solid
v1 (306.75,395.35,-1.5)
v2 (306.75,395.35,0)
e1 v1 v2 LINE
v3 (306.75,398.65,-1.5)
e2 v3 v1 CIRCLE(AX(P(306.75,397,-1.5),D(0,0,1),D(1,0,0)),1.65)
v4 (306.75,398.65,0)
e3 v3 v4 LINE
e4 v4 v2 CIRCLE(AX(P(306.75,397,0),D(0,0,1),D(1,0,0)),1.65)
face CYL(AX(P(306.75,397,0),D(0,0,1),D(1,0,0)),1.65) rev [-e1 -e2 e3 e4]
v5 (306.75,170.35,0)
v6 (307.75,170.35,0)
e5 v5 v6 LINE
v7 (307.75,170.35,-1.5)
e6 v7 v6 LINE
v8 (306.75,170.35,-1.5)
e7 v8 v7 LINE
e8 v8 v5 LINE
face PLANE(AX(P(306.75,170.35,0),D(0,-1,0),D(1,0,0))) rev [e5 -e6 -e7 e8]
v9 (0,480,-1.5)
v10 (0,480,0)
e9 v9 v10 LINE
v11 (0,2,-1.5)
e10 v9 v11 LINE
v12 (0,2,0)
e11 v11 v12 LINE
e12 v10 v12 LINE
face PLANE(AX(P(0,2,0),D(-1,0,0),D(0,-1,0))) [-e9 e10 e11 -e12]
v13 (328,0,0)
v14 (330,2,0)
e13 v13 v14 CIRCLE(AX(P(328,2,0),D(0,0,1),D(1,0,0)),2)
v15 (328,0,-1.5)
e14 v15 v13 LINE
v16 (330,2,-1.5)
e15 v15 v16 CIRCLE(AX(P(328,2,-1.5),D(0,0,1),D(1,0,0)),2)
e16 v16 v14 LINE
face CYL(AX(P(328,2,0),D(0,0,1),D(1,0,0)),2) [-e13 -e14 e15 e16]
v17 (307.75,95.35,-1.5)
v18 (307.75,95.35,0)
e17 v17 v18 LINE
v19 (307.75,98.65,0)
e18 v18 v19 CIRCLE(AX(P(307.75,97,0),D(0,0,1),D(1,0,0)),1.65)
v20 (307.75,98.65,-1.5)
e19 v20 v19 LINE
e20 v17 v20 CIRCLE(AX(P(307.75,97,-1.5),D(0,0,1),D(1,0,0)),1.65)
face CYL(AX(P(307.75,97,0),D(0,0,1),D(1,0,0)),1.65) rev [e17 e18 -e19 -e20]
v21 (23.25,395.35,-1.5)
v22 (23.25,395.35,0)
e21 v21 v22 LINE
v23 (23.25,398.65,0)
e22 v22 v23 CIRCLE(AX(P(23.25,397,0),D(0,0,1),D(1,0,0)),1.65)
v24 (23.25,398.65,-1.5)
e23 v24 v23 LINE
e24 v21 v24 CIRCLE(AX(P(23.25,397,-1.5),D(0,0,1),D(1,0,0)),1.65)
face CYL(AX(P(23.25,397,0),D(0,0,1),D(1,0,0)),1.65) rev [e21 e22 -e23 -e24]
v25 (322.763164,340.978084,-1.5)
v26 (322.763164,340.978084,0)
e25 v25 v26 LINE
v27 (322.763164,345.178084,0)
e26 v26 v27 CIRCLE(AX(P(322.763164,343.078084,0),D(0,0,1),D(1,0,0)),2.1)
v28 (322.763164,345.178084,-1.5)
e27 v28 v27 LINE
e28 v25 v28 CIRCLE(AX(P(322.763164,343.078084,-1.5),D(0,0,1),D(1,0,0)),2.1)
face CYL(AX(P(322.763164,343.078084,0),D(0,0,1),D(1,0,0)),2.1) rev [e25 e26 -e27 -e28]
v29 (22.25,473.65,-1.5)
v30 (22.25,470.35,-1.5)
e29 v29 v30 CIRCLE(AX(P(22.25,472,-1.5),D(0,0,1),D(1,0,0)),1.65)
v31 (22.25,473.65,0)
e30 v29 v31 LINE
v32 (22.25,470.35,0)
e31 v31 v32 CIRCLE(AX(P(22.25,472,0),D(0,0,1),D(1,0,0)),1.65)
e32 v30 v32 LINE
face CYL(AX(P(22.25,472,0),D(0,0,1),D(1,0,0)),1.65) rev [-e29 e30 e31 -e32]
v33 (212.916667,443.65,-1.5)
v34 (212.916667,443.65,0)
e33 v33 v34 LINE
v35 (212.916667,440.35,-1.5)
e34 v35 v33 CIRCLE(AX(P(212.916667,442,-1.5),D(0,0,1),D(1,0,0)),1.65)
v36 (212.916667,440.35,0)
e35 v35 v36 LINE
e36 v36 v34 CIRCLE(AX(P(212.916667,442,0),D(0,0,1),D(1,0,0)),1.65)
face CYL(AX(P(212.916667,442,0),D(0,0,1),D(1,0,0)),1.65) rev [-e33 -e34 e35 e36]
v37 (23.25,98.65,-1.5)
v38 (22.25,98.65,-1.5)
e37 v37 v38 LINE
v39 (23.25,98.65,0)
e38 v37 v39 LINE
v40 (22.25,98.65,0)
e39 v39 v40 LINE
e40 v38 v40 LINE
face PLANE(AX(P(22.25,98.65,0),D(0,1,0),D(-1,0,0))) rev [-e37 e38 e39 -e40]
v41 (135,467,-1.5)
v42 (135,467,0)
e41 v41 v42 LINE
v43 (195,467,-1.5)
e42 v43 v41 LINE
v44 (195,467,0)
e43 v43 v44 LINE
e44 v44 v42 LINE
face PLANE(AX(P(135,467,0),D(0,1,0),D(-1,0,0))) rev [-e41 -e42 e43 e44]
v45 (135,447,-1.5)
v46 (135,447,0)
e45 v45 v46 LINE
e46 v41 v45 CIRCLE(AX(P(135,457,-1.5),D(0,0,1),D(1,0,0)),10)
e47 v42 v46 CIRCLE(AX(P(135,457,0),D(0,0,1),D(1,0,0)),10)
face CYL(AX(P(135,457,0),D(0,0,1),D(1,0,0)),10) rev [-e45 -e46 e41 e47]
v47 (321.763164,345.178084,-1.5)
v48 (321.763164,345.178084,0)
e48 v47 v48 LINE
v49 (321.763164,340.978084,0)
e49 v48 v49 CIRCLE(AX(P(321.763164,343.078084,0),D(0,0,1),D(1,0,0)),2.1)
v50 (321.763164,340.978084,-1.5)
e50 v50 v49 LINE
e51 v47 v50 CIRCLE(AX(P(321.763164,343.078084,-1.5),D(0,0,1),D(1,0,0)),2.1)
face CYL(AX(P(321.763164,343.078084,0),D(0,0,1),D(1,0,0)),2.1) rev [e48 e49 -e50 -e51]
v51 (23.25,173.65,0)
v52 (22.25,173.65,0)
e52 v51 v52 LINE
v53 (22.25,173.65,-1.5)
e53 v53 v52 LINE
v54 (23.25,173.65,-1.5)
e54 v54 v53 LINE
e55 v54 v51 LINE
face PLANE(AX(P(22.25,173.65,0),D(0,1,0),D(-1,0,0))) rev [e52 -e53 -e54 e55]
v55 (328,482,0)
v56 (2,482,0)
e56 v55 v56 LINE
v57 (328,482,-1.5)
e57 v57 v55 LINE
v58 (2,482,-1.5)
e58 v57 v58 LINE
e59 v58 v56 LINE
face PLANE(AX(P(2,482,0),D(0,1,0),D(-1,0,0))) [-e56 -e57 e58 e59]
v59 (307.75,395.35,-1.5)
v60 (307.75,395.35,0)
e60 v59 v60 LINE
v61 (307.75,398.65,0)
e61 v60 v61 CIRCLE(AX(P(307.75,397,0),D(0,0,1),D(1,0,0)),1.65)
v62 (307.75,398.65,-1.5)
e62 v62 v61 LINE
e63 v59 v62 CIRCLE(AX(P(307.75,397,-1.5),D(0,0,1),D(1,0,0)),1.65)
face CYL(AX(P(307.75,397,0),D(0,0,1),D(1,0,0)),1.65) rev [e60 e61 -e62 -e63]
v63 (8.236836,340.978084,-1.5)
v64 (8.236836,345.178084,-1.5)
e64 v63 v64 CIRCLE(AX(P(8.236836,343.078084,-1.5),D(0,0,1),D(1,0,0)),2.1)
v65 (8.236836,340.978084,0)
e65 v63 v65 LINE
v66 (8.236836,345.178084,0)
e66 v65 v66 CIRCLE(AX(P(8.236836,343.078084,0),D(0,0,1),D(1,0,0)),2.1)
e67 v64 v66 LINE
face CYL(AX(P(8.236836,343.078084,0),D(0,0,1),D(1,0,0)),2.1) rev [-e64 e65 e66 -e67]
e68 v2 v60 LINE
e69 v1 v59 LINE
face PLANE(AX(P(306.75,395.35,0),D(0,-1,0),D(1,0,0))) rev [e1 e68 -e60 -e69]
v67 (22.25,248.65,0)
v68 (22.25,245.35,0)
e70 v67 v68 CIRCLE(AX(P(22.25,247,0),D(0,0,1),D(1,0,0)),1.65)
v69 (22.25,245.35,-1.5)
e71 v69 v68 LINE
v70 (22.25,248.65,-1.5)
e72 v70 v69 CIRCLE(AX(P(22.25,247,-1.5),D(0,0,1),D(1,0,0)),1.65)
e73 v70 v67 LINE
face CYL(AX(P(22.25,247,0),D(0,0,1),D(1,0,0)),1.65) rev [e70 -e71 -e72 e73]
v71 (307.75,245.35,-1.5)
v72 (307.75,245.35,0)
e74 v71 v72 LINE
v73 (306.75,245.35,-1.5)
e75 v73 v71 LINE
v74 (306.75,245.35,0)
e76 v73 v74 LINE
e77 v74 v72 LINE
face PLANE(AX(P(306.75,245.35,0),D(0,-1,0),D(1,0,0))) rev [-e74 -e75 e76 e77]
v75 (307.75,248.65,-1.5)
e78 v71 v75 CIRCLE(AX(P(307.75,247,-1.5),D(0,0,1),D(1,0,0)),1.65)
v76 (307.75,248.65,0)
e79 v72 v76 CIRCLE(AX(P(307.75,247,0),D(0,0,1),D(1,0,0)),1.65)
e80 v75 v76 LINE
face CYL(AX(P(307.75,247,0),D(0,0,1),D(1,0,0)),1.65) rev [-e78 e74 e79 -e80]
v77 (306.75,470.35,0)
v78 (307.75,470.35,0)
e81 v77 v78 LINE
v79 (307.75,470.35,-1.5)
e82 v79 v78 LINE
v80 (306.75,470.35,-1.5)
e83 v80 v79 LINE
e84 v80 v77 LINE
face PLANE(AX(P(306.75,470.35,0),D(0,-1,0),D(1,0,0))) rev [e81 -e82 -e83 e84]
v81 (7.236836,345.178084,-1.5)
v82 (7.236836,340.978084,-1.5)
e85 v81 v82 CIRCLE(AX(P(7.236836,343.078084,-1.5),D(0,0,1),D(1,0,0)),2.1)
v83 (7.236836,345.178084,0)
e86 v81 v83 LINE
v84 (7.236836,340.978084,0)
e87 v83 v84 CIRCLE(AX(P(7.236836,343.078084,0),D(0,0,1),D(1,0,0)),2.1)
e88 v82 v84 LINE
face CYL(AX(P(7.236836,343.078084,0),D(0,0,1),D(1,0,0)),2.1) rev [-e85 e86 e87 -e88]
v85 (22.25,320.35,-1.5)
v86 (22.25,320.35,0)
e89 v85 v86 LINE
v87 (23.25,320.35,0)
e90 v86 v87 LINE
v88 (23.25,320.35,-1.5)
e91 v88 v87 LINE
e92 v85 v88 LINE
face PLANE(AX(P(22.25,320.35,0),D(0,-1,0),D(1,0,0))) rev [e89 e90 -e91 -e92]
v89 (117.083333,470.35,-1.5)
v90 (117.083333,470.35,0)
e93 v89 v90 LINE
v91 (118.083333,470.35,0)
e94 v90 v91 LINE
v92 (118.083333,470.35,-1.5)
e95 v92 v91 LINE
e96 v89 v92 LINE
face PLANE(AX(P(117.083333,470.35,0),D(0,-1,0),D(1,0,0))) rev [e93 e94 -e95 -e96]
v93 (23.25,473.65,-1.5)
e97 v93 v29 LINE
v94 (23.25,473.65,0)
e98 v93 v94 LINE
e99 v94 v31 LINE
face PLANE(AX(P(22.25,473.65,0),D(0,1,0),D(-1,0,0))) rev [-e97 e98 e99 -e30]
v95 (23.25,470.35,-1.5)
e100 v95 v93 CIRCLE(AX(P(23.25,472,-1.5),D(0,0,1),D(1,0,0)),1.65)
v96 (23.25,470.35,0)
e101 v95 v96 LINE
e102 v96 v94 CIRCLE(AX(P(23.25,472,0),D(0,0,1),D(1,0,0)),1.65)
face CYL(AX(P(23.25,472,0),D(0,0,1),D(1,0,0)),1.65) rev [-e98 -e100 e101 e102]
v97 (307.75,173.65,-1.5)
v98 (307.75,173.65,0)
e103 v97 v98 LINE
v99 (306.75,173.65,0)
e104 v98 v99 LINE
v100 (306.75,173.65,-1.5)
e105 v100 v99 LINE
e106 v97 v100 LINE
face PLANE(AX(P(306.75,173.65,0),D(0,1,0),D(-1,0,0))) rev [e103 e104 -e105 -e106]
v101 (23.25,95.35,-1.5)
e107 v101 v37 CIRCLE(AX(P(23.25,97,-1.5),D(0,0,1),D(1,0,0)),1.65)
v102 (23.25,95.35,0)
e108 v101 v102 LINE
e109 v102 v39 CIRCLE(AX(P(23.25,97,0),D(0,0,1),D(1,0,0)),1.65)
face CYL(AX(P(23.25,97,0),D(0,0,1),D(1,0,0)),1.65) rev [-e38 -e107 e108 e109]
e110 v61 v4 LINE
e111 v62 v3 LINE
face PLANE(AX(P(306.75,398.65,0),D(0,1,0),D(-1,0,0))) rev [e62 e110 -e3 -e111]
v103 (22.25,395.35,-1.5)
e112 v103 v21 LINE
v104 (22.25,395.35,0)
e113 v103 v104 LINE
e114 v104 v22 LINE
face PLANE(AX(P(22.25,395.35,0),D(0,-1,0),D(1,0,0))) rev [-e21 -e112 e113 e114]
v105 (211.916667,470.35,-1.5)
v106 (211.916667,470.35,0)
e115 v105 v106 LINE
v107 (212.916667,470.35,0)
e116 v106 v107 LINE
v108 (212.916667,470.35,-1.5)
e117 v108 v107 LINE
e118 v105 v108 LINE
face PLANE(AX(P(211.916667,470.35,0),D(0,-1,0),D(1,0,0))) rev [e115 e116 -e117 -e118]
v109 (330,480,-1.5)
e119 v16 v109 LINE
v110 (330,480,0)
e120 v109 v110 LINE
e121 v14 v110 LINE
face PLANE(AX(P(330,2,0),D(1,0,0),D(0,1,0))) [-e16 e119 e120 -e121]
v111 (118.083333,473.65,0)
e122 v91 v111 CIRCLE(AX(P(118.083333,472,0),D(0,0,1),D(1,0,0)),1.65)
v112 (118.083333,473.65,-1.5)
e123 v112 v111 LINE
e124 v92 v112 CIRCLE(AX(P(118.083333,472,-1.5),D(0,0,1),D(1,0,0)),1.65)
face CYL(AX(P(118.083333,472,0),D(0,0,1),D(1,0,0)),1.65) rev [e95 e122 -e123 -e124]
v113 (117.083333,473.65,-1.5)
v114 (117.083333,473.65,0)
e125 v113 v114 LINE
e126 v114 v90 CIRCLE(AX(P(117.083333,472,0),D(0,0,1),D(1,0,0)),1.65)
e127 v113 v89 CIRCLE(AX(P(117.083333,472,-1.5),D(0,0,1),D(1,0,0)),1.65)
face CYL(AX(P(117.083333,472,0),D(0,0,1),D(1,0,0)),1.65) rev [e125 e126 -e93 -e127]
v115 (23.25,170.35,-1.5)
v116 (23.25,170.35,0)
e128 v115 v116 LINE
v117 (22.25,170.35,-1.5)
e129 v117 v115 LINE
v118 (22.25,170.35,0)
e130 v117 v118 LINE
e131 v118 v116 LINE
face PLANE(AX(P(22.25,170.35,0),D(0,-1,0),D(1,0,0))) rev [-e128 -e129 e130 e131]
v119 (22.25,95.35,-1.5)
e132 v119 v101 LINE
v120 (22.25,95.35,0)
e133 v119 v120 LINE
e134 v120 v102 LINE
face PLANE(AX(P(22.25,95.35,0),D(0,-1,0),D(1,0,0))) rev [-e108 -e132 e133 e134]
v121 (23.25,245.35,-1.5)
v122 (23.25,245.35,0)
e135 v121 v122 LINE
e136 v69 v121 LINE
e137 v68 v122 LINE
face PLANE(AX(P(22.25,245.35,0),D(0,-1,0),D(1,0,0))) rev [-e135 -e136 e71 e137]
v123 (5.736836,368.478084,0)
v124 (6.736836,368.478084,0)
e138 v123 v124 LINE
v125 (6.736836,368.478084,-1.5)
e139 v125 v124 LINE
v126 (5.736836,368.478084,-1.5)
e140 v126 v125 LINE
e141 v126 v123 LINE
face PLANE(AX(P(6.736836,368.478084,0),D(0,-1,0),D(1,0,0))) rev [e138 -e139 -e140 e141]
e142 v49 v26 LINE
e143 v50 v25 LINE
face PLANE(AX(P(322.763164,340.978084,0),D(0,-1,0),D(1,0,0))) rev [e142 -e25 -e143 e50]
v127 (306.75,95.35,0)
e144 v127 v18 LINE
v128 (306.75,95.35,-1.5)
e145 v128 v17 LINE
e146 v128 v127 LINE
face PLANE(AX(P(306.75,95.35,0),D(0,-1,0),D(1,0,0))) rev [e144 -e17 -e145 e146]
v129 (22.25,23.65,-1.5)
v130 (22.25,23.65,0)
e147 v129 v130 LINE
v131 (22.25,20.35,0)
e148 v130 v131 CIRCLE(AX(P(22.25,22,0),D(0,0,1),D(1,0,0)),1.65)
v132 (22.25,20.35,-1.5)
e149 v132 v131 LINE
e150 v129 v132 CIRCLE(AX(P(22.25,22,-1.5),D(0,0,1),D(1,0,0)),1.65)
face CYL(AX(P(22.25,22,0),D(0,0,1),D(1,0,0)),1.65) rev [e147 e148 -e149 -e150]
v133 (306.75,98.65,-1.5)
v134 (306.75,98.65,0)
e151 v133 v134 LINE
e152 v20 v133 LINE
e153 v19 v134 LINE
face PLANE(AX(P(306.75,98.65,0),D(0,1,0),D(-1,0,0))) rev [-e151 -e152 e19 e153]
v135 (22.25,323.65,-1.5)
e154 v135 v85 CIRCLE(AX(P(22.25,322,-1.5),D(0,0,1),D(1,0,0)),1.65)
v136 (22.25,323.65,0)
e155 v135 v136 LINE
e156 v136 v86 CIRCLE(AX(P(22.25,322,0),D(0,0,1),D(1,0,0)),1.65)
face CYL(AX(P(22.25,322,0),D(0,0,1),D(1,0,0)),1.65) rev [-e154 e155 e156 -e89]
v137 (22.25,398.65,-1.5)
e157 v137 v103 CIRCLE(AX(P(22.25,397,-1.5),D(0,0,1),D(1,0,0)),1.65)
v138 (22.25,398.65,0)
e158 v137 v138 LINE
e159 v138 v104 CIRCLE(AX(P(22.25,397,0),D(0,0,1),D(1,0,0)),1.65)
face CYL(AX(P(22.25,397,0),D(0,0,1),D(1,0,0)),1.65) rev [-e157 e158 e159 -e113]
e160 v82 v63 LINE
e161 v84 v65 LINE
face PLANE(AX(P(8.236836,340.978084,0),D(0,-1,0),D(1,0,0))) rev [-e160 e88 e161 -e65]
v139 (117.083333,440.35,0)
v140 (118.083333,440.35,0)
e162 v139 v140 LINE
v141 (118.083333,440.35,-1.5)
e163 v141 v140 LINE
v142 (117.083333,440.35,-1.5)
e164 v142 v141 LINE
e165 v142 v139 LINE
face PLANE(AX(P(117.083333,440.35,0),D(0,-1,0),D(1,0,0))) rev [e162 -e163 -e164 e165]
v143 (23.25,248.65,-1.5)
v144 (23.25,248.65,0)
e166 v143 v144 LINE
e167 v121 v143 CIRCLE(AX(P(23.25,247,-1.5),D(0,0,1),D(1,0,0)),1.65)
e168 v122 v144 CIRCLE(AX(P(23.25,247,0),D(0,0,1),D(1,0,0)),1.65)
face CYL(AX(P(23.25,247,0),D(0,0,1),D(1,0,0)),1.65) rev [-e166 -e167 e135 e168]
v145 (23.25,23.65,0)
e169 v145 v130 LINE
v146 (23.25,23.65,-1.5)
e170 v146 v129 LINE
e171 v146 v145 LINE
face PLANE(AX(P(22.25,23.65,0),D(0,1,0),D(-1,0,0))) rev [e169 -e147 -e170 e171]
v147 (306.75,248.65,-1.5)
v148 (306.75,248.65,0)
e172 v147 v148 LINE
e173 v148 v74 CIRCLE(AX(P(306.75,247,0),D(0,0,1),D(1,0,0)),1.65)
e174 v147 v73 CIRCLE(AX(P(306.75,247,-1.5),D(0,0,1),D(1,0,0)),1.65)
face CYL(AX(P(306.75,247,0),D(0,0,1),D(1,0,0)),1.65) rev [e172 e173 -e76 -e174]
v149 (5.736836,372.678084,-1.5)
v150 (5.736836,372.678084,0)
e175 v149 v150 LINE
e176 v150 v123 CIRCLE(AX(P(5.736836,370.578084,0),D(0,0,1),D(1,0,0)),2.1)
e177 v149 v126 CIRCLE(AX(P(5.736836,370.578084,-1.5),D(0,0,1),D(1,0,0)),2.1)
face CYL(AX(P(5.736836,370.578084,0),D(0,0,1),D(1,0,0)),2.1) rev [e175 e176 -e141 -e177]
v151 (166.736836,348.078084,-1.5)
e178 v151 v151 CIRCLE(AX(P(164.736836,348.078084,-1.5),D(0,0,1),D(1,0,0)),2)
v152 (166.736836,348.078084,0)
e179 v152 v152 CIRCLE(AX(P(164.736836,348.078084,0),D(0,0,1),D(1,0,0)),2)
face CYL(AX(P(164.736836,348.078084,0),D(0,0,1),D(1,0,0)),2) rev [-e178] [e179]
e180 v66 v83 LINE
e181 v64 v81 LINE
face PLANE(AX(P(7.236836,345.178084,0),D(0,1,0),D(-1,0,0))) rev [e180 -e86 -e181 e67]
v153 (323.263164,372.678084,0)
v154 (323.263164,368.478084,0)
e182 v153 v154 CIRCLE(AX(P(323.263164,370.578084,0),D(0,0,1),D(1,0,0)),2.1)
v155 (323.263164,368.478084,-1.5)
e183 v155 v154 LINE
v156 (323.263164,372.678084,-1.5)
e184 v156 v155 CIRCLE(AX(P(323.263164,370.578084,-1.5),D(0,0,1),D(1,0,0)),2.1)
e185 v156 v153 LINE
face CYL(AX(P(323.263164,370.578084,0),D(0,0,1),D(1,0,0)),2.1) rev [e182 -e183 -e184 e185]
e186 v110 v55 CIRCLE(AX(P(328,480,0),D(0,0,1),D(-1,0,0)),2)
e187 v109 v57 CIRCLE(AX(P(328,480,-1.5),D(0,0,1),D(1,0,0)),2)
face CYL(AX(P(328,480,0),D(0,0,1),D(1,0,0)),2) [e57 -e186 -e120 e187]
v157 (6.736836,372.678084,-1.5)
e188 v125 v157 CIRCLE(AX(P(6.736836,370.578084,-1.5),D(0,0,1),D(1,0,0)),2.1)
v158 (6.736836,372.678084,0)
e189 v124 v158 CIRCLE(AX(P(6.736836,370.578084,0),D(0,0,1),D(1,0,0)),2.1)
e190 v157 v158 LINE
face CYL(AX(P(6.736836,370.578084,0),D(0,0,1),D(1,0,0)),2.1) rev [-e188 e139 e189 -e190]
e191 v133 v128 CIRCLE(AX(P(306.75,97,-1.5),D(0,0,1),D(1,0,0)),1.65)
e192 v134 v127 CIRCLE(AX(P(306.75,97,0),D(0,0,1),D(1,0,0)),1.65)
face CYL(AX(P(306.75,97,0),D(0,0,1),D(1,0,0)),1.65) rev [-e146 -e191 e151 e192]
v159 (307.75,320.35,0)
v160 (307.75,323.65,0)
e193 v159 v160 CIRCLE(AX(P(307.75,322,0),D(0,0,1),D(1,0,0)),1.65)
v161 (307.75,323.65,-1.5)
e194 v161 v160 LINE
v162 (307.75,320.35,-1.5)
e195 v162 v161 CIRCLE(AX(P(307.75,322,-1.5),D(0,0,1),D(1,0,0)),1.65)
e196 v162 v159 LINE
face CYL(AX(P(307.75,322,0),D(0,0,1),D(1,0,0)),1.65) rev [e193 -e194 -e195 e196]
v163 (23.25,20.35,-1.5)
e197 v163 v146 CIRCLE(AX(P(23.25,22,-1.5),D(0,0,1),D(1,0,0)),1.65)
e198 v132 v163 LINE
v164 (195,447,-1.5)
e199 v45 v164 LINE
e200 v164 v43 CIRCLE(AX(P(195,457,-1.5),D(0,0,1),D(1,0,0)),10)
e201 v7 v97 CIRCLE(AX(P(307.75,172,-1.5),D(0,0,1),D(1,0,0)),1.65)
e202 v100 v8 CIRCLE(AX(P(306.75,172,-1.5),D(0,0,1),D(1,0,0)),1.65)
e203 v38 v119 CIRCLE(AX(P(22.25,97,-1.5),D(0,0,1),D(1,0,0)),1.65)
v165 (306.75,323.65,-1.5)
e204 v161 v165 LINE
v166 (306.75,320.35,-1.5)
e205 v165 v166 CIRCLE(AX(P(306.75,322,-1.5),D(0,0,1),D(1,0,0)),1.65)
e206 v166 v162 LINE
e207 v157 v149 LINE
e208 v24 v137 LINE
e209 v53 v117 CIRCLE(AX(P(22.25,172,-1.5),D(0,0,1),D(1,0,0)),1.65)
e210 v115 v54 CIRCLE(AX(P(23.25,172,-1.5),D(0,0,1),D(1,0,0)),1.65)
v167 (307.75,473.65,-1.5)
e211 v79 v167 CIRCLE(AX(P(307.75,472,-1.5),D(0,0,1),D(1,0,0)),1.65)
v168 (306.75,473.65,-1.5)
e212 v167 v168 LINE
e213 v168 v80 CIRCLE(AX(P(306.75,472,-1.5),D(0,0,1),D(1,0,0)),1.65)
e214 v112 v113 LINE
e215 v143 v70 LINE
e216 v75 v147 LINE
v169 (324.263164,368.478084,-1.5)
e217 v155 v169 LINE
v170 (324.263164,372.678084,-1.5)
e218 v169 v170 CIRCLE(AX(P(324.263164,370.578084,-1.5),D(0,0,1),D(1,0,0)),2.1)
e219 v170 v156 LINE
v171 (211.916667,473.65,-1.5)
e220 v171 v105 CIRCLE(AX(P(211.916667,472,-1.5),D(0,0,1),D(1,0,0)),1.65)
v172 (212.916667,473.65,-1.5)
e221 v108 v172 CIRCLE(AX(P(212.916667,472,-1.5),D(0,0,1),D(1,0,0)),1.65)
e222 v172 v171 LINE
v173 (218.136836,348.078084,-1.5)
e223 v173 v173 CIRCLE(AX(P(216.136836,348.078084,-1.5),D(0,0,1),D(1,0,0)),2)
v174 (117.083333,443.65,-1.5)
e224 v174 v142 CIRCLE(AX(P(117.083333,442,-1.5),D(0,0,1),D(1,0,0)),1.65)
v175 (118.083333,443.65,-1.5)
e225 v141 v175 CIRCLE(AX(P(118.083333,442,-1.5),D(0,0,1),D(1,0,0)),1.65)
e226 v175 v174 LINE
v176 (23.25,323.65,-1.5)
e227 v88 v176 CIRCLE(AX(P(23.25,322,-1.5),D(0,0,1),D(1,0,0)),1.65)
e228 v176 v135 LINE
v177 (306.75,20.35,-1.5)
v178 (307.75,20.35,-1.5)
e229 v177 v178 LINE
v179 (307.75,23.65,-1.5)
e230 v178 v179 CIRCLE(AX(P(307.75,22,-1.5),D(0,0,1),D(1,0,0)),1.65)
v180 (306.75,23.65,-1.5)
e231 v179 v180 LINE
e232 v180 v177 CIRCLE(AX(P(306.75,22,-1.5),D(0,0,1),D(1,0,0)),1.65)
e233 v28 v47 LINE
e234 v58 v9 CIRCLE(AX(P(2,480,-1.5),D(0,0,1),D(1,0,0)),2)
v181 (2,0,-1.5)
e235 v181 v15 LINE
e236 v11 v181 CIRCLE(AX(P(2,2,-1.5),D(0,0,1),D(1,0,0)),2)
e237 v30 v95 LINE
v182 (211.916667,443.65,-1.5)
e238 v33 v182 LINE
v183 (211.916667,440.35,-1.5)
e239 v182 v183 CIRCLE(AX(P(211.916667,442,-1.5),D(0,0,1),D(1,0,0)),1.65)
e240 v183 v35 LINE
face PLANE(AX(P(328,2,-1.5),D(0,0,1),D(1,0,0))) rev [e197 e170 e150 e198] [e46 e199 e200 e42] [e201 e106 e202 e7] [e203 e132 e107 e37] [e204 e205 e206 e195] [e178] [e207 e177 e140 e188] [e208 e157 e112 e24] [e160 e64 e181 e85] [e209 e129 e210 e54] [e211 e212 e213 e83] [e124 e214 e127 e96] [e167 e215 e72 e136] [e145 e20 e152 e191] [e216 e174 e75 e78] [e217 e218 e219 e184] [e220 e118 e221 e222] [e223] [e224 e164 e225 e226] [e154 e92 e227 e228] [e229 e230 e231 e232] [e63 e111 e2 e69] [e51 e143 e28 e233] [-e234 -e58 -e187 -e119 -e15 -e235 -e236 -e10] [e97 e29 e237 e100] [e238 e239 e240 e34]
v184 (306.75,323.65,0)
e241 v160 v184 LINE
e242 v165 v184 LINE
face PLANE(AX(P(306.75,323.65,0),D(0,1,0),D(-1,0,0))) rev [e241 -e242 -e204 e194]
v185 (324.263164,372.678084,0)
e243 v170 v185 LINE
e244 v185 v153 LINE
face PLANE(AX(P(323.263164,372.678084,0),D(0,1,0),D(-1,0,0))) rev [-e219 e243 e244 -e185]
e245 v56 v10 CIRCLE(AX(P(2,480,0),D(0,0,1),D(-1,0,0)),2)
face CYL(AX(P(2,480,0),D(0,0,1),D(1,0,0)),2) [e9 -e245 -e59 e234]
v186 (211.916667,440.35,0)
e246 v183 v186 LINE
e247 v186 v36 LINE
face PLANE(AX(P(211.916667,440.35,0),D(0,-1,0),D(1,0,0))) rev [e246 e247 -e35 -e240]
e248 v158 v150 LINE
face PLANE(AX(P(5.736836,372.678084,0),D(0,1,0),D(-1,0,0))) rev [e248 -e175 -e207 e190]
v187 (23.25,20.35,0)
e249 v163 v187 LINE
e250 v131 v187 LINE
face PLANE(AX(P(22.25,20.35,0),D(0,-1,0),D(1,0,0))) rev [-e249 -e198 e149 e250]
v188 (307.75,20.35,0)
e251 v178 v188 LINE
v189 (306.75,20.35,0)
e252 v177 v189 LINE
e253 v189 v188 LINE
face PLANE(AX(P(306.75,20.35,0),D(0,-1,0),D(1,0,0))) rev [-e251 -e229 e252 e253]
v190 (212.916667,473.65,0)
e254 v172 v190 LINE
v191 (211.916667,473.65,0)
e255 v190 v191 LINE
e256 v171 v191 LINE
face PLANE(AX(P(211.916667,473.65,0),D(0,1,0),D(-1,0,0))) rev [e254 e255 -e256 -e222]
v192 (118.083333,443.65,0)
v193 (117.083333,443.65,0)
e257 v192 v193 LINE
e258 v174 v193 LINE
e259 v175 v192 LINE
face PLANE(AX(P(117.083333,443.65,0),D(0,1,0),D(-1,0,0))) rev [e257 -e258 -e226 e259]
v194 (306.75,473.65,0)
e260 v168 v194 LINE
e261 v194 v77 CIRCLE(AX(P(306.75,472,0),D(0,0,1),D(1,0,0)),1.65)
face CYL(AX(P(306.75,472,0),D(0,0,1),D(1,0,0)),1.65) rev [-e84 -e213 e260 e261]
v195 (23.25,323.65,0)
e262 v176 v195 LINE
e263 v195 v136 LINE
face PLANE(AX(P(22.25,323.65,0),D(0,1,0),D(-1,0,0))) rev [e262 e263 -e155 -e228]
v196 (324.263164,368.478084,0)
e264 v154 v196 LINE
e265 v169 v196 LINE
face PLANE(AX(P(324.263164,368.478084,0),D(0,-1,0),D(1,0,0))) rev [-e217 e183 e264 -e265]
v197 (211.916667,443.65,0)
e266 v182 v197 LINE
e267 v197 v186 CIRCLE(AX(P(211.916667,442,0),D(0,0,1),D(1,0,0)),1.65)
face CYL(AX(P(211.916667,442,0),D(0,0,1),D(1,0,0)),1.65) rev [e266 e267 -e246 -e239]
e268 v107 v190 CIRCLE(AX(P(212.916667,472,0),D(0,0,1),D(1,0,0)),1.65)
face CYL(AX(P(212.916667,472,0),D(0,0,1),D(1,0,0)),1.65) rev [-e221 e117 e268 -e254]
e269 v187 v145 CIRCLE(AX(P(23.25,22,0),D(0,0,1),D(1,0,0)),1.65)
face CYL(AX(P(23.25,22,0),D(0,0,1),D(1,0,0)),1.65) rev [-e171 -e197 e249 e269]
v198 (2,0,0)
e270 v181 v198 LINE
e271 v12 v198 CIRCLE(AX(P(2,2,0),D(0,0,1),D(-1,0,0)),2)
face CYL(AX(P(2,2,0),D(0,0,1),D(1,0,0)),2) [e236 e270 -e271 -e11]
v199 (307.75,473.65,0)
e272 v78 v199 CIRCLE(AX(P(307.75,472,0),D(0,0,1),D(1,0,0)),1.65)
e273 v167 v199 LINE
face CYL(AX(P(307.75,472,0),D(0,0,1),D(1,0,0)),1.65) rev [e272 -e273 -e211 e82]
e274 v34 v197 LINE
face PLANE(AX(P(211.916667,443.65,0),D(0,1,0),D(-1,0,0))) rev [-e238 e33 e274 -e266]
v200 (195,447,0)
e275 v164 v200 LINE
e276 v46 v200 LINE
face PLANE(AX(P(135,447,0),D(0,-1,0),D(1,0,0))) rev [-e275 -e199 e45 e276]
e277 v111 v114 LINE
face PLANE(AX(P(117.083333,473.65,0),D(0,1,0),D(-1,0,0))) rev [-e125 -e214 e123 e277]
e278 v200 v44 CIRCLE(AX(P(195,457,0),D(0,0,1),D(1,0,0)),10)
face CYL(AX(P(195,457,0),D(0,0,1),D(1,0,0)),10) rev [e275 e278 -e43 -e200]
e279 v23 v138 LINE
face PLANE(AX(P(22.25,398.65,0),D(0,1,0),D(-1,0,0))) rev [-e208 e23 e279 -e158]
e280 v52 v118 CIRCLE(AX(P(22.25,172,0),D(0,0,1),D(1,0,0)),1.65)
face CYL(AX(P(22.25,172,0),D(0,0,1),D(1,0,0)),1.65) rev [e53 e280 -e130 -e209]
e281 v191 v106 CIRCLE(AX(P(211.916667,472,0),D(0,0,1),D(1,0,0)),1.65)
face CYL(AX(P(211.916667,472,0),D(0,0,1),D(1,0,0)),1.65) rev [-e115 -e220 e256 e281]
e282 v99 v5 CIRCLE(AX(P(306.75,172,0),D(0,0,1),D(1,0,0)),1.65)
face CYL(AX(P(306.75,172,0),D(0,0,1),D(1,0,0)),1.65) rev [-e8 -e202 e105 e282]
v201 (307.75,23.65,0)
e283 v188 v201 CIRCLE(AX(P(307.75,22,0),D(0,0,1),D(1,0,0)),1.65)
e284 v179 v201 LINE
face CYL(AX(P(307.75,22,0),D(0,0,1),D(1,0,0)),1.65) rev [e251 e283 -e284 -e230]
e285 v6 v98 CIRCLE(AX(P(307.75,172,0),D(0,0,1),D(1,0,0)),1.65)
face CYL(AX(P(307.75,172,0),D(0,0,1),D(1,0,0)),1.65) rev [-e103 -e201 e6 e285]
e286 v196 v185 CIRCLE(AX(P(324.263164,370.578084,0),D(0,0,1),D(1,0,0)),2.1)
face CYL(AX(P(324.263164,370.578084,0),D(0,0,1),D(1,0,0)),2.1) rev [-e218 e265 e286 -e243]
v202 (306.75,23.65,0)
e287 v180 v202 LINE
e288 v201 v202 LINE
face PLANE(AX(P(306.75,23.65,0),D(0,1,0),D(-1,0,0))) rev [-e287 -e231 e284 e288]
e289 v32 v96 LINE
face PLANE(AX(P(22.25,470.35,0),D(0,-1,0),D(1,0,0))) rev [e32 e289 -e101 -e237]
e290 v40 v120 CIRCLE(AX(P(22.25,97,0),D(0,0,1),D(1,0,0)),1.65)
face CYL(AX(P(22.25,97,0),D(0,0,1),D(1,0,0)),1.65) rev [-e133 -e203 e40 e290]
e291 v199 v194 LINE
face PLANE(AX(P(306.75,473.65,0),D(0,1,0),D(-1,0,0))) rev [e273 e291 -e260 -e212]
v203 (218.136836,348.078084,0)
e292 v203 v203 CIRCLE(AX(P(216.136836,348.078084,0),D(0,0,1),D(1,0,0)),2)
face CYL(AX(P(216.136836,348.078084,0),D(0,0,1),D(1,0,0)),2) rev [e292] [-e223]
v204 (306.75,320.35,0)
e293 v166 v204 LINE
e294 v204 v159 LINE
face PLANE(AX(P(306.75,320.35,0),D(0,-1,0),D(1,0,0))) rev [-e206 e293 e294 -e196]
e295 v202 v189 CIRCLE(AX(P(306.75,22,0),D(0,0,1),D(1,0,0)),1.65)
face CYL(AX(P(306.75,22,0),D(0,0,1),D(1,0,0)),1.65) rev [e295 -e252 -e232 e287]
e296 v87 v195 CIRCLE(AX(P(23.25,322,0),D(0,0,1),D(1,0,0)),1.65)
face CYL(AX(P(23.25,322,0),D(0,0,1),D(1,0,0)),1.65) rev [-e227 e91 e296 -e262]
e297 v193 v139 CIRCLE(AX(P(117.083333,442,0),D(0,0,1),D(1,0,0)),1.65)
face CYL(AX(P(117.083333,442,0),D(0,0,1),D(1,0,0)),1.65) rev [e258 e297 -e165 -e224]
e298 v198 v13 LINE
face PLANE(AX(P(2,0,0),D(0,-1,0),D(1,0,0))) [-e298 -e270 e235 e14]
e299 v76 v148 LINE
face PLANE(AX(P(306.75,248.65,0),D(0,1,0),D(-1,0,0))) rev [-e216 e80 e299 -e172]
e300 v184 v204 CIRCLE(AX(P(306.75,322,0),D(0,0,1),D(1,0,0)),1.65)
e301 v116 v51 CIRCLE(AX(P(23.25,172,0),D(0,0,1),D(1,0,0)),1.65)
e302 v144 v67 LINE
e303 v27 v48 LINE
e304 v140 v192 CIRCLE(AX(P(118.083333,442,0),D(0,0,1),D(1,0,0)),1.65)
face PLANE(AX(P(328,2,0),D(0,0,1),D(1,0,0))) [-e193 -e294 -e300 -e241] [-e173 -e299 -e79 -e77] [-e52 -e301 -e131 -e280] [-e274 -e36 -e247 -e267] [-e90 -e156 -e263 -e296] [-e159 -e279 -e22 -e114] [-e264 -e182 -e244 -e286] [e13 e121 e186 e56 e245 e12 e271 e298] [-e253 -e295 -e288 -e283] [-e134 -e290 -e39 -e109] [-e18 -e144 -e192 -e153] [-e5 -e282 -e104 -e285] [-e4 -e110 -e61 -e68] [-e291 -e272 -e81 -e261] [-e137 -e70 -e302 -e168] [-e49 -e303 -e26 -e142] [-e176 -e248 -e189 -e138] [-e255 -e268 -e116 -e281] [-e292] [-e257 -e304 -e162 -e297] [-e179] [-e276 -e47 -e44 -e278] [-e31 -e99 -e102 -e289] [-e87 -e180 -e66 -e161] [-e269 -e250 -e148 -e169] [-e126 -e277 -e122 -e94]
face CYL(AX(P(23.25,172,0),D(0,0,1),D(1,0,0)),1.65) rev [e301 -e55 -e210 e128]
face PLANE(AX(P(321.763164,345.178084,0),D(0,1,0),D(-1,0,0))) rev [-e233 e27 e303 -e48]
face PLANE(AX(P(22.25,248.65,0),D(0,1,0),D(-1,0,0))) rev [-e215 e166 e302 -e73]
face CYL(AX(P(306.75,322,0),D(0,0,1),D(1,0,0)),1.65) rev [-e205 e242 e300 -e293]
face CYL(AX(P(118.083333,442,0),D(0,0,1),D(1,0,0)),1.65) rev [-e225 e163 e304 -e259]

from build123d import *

# Parameters (mm, degrees)
CONVERT_SOLID1_START     = -1.5
CONVERT_SOLID1_OUTLINE_R = 2
CONVERT_SOLID1_DEPTH     = 1.5


# Read off the part's stored shape, not the designer's step: Convert-Solid1
with BuildPart() as part:
    # Convert-Solid1 outline → Convert-Solid1 (new body)
    with BuildSketch(Plane.XY.offset(CONVERT_SOLID1_START)):
        with BuildLine():
            Line((330, 2), (330, 480))
            ThreePointArc((330, 480), (329.414213562, 481.414213562), (328, 482))
            Line((328, 482), (2, 482))
            ThreePointArc((2, 482), (0.585786438, 481.414213562), (0, 480))
            Line((0, 480), (0, 2))
            ThreePointArc((0, 2), (0.585786438, 0.585786438), (2, 0))
            Line((2, 0), (328, 0))
            ThreePointArc((328, 0), (329.414213562, 0.585786438), (330, 2))
        make_face()
        with BuildLine():
            ThreePointArc((23.25, 23.65), (24.9, 22), (23.25, 20.35))
            Line((23.25, 20.35), (22.25, 20.35))
            ThreePointArc((22.25, 20.35), (20.6, 22), (22.25, 23.65))
            Line((22.25, 23.65), (23.25, 23.65))
        make_face(mode=Mode.SUBTRACT)
        with BuildLine():
            ThreePointArc((23.25, 98.65), (24.9, 97), (23.25, 95.35))
            Line((23.25, 95.35), (22.25, 95.35))
            ThreePointArc((22.25, 95.35), (20.6, 97), (22.25, 98.65))
            Line((22.25, 98.65), (23.25, 98.65))
        make_face(mode=Mode.SUBTRACT)
        with BuildLine():
            ThreePointArc((23.25, 173.65), (24.9, 172), (23.25, 170.35))
            Line((23.25, 170.35), (22.25, 170.35))
            ThreePointArc((22.25, 170.35), (20.6, 172), (22.25, 173.65))
            Line((22.25, 173.65), (23.25, 173.65))
        make_face(mode=Mode.SUBTRACT)
        with BuildLine():
            ThreePointArc((307.75, 23.65), (309.4, 22), (307.75, 20.35))
            Line((307.75, 20.35), (306.75, 20.35))
            ThreePointArc((306.75, 20.35), (305.1, 22), (306.75, 23.65))
            Line((306.75, 23.65), (307.75, 23.65))
        make_face(mode=Mode.SUBTRACT)
        with BuildLine():
            ThreePointArc((307.75, 98.65), (309.4, 97), (307.75, 95.35))
            Line((307.75, 95.35), (306.75, 95.35))
            ThreePointArc((306.75, 95.35), (305.1, 97), (306.75, 98.65))
            Line((306.75, 98.65), (307.75, 98.65))
        make_face(mode=Mode.SUBTRACT)
        with BuildLine():
            ThreePointArc((307.75, 173.65), (309.4, 172), (307.75, 170.35))
            Line((307.75, 170.35), (306.75, 170.35))
            ThreePointArc((306.75, 170.35), (305.1, 172), (306.75, 173.65))
            Line((306.75, 173.65), (307.75, 173.65))
        make_face(mode=Mode.SUBTRACT)
        with BuildLine():
            ThreePointArc((23.25, 248.65), (24.9, 247), (23.25, 245.35))
            Line((23.25, 245.35), (22.25, 245.35))
            ThreePointArc((22.25, 245.35), (20.6, 247), (22.25, 248.65))
            Line((22.25, 248.65), (23.25, 248.65))
        make_face(mode=Mode.SUBTRACT)
        with BuildLine():
            ThreePointArc((23.25, 323.65), (24.9, 322), (23.25, 320.35))
            Line((23.25, 320.35), (22.25, 320.35))
            ThreePointArc((22.25, 320.35), (20.6, 322), (22.25, 323.65))
            Line((22.25, 323.65), (23.25, 323.65))
        make_face(mode=Mode.SUBTRACT)
        with BuildLine():
            ThreePointArc((8.23683607, 345.178083895), (10.33683607, 343.078083895), (8.23683607, 340.978083895))
            Line((8.23683607, 340.978083895), (7.23683607, 340.978083895))
            ThreePointArc((7.23683607, 340.978083895), (5.13683607, 343.078083895), (7.23683607, 345.178083895))
            Line((7.23683607, 345.178083895), (8.23683607, 345.178083895))
        make_face(mode=Mode.SUBTRACT)
        with Locations((164.73683607, 348.078083895)):
            Circle(CONVERT_SOLID1_OUTLINE_R, mode=Mode.SUBTRACT)
        with BuildLine():
            ThreePointArc((6.73683607, 372.678083895), (8.83683607, 370.578083895), (6.73683607, 368.478083895))
            Line((6.73683607, 368.478083895), (5.73683607, 368.478083895))
            ThreePointArc((5.73683607, 368.478083895), (3.63683607, 370.578083895), (5.73683607, 372.678083895))
            Line((5.73683607, 372.678083895), (6.73683607, 372.678083895))
        make_face(mode=Mode.SUBTRACT)
        with BuildLine():
            ThreePointArc((23.25, 398.65), (24.9, 397), (23.25, 395.35))
            Line((23.25, 395.35), (22.25, 395.35))
            ThreePointArc((22.25, 395.35), (20.6, 397), (22.25, 398.65))
            Line((22.25, 398.65), (23.25, 398.65))
        make_face(mode=Mode.SUBTRACT)
        with BuildLine():
            ThreePointArc((23.25, 473.65), (24.9, 472), (23.25, 470.35))
            Line((23.25, 470.35), (22.25, 470.35))
            ThreePointArc((22.25, 470.35), (20.6, 472), (22.25, 473.65))
            Line((22.25, 473.65), (23.25, 473.65))
        make_face(mode=Mode.SUBTRACT)
        with BuildLine():
            ThreePointArc((118.083333333, 443.65), (119.733333333, 442), (118.083333333, 440.35))
            Line((118.083333333, 440.35), (117.083333333, 440.35))
            ThreePointArc((117.083333333, 440.35), (115.433333333, 442), (117.083333333, 443.65))
            Line((117.083333333, 443.65), (118.083333333, 443.65))
        make_face(mode=Mode.SUBTRACT)
        with BuildLine():
            ThreePointArc((118.083333333, 473.65), (119.733333333, 472), (118.083333333, 470.35))
            Line((118.083333333, 470.35), (117.083333333, 470.35))
            ThreePointArc((117.083333333, 470.35), (115.433333333, 472), (117.083333333, 473.65))
            Line((117.083333333, 473.65), (118.083333333, 473.65))
        make_face(mode=Mode.SUBTRACT)
        with Locations((216.13683607, 348.078083895)):
            Circle(CONVERT_SOLID1_OUTLINE_R, mode=Mode.SUBTRACT)
        with BuildLine():
            ThreePointArc((307.75, 248.65), (309.4, 247), (307.75, 245.35))
            Line((307.75, 245.35), (306.75, 245.35))
            ThreePointArc((306.75, 245.35), (305.1, 247), (306.75, 248.65))
            Line((306.75, 248.65), (307.75, 248.65))
        make_face(mode=Mode.SUBTRACT)
        with BuildLine():
            ThreePointArc((307.75, 323.65), (309.4, 322), (307.75, 320.35))
            Line((307.75, 320.35), (306.75, 320.35))
            ThreePointArc((306.75, 320.35), (305.1, 322), (306.75, 323.65))
            Line((306.75, 323.65), (307.75, 323.65))
        make_face(mode=Mode.SUBTRACT)
        with BuildLine():
            ThreePointArc((322.76316393, 345.178083895), (324.86316393, 343.078083895), (322.76316393, 340.978083895))
            Line((322.76316393, 340.978083895), (321.76316393, 340.978083895))
            ThreePointArc((321.76316393, 340.978083895), (319.66316393, 343.078083895), (321.76316393, 345.178083895))
            Line((321.76316393, 345.178083895), (322.76316393, 345.178083895))
        make_face(mode=Mode.SUBTRACT)
        with BuildLine():
            ThreePointArc((195, 467), (205, 457), (195, 447))
            Line((195, 447), (135, 447))
            ThreePointArc((135, 447), (125, 457), (135, 467))
            Line((135, 467), (195, 467))
        make_face(mode=Mode.SUBTRACT)
        with BuildLine():
            ThreePointArc((212.916666667, 443.65), (214.566666667, 442), (212.916666667, 440.35))
            Line((212.916666667, 440.35), (211.916666667, 440.35))
            ThreePointArc((211.916666667, 440.35), (210.266666667, 442), (211.916666667, 443.65))
            Line((211.916666667, 443.65), (212.916666667, 443.65))
        make_face(mode=Mode.SUBTRACT)
        with BuildLine():
            ThreePointArc((212.916666667, 473.65), (214.566666667, 472), (212.916666667, 470.35))
            Line((212.916666667, 470.35), (211.916666667, 470.35))
            ThreePointArc((211.916666667, 470.35), (210.266666667, 472), (211.916666667, 473.65))
            Line((211.916666667, 473.65), (212.916666667, 473.65))
        make_face(mode=Mode.SUBTRACT)
        with BuildLine():
            ThreePointArc((324.26316393, 372.678083895), (326.36316393, 370.578083895), (324.26316393, 368.478083895))
            Line((324.26316393, 368.478083895), (323.26316393, 368.478083895))
            ThreePointArc((323.26316393, 368.478083895), (321.16316393, 370.578083895), (323.26316393, 372.678083895))
            Line((323.26316393, 372.678083895), (324.26316393, 372.678083895))
        make_face(mode=Mode.SUBTRACT)
        with BuildLine():
            ThreePointArc((307.75, 398.65), (309.4, 397), (307.75, 395.35))
            Line((307.75, 395.35), (306.75, 395.35))
            ThreePointArc((306.75, 395.35), (305.1, 397), (306.75, 398.65))
            Line((306.75, 398.65), (307.75, 398.65))
        make_face(mode=Mode.SUBTRACT)
        with BuildLine():
            ThreePointArc((307.75, 473.65), (309.4, 472), (307.75, 470.35))
            Line((307.75, 470.35), (306.75, 470.35))
            ThreePointArc((306.75, 470.35), (305.1, 472), (306.75, 473.65))
            Line((306.75, 473.65), (307.75, 473.65))
        make_face(mode=Mode.SUBTRACT)
    extrude(amount=CONVERT_SOLID1_DEPTH)


solid = part.part
